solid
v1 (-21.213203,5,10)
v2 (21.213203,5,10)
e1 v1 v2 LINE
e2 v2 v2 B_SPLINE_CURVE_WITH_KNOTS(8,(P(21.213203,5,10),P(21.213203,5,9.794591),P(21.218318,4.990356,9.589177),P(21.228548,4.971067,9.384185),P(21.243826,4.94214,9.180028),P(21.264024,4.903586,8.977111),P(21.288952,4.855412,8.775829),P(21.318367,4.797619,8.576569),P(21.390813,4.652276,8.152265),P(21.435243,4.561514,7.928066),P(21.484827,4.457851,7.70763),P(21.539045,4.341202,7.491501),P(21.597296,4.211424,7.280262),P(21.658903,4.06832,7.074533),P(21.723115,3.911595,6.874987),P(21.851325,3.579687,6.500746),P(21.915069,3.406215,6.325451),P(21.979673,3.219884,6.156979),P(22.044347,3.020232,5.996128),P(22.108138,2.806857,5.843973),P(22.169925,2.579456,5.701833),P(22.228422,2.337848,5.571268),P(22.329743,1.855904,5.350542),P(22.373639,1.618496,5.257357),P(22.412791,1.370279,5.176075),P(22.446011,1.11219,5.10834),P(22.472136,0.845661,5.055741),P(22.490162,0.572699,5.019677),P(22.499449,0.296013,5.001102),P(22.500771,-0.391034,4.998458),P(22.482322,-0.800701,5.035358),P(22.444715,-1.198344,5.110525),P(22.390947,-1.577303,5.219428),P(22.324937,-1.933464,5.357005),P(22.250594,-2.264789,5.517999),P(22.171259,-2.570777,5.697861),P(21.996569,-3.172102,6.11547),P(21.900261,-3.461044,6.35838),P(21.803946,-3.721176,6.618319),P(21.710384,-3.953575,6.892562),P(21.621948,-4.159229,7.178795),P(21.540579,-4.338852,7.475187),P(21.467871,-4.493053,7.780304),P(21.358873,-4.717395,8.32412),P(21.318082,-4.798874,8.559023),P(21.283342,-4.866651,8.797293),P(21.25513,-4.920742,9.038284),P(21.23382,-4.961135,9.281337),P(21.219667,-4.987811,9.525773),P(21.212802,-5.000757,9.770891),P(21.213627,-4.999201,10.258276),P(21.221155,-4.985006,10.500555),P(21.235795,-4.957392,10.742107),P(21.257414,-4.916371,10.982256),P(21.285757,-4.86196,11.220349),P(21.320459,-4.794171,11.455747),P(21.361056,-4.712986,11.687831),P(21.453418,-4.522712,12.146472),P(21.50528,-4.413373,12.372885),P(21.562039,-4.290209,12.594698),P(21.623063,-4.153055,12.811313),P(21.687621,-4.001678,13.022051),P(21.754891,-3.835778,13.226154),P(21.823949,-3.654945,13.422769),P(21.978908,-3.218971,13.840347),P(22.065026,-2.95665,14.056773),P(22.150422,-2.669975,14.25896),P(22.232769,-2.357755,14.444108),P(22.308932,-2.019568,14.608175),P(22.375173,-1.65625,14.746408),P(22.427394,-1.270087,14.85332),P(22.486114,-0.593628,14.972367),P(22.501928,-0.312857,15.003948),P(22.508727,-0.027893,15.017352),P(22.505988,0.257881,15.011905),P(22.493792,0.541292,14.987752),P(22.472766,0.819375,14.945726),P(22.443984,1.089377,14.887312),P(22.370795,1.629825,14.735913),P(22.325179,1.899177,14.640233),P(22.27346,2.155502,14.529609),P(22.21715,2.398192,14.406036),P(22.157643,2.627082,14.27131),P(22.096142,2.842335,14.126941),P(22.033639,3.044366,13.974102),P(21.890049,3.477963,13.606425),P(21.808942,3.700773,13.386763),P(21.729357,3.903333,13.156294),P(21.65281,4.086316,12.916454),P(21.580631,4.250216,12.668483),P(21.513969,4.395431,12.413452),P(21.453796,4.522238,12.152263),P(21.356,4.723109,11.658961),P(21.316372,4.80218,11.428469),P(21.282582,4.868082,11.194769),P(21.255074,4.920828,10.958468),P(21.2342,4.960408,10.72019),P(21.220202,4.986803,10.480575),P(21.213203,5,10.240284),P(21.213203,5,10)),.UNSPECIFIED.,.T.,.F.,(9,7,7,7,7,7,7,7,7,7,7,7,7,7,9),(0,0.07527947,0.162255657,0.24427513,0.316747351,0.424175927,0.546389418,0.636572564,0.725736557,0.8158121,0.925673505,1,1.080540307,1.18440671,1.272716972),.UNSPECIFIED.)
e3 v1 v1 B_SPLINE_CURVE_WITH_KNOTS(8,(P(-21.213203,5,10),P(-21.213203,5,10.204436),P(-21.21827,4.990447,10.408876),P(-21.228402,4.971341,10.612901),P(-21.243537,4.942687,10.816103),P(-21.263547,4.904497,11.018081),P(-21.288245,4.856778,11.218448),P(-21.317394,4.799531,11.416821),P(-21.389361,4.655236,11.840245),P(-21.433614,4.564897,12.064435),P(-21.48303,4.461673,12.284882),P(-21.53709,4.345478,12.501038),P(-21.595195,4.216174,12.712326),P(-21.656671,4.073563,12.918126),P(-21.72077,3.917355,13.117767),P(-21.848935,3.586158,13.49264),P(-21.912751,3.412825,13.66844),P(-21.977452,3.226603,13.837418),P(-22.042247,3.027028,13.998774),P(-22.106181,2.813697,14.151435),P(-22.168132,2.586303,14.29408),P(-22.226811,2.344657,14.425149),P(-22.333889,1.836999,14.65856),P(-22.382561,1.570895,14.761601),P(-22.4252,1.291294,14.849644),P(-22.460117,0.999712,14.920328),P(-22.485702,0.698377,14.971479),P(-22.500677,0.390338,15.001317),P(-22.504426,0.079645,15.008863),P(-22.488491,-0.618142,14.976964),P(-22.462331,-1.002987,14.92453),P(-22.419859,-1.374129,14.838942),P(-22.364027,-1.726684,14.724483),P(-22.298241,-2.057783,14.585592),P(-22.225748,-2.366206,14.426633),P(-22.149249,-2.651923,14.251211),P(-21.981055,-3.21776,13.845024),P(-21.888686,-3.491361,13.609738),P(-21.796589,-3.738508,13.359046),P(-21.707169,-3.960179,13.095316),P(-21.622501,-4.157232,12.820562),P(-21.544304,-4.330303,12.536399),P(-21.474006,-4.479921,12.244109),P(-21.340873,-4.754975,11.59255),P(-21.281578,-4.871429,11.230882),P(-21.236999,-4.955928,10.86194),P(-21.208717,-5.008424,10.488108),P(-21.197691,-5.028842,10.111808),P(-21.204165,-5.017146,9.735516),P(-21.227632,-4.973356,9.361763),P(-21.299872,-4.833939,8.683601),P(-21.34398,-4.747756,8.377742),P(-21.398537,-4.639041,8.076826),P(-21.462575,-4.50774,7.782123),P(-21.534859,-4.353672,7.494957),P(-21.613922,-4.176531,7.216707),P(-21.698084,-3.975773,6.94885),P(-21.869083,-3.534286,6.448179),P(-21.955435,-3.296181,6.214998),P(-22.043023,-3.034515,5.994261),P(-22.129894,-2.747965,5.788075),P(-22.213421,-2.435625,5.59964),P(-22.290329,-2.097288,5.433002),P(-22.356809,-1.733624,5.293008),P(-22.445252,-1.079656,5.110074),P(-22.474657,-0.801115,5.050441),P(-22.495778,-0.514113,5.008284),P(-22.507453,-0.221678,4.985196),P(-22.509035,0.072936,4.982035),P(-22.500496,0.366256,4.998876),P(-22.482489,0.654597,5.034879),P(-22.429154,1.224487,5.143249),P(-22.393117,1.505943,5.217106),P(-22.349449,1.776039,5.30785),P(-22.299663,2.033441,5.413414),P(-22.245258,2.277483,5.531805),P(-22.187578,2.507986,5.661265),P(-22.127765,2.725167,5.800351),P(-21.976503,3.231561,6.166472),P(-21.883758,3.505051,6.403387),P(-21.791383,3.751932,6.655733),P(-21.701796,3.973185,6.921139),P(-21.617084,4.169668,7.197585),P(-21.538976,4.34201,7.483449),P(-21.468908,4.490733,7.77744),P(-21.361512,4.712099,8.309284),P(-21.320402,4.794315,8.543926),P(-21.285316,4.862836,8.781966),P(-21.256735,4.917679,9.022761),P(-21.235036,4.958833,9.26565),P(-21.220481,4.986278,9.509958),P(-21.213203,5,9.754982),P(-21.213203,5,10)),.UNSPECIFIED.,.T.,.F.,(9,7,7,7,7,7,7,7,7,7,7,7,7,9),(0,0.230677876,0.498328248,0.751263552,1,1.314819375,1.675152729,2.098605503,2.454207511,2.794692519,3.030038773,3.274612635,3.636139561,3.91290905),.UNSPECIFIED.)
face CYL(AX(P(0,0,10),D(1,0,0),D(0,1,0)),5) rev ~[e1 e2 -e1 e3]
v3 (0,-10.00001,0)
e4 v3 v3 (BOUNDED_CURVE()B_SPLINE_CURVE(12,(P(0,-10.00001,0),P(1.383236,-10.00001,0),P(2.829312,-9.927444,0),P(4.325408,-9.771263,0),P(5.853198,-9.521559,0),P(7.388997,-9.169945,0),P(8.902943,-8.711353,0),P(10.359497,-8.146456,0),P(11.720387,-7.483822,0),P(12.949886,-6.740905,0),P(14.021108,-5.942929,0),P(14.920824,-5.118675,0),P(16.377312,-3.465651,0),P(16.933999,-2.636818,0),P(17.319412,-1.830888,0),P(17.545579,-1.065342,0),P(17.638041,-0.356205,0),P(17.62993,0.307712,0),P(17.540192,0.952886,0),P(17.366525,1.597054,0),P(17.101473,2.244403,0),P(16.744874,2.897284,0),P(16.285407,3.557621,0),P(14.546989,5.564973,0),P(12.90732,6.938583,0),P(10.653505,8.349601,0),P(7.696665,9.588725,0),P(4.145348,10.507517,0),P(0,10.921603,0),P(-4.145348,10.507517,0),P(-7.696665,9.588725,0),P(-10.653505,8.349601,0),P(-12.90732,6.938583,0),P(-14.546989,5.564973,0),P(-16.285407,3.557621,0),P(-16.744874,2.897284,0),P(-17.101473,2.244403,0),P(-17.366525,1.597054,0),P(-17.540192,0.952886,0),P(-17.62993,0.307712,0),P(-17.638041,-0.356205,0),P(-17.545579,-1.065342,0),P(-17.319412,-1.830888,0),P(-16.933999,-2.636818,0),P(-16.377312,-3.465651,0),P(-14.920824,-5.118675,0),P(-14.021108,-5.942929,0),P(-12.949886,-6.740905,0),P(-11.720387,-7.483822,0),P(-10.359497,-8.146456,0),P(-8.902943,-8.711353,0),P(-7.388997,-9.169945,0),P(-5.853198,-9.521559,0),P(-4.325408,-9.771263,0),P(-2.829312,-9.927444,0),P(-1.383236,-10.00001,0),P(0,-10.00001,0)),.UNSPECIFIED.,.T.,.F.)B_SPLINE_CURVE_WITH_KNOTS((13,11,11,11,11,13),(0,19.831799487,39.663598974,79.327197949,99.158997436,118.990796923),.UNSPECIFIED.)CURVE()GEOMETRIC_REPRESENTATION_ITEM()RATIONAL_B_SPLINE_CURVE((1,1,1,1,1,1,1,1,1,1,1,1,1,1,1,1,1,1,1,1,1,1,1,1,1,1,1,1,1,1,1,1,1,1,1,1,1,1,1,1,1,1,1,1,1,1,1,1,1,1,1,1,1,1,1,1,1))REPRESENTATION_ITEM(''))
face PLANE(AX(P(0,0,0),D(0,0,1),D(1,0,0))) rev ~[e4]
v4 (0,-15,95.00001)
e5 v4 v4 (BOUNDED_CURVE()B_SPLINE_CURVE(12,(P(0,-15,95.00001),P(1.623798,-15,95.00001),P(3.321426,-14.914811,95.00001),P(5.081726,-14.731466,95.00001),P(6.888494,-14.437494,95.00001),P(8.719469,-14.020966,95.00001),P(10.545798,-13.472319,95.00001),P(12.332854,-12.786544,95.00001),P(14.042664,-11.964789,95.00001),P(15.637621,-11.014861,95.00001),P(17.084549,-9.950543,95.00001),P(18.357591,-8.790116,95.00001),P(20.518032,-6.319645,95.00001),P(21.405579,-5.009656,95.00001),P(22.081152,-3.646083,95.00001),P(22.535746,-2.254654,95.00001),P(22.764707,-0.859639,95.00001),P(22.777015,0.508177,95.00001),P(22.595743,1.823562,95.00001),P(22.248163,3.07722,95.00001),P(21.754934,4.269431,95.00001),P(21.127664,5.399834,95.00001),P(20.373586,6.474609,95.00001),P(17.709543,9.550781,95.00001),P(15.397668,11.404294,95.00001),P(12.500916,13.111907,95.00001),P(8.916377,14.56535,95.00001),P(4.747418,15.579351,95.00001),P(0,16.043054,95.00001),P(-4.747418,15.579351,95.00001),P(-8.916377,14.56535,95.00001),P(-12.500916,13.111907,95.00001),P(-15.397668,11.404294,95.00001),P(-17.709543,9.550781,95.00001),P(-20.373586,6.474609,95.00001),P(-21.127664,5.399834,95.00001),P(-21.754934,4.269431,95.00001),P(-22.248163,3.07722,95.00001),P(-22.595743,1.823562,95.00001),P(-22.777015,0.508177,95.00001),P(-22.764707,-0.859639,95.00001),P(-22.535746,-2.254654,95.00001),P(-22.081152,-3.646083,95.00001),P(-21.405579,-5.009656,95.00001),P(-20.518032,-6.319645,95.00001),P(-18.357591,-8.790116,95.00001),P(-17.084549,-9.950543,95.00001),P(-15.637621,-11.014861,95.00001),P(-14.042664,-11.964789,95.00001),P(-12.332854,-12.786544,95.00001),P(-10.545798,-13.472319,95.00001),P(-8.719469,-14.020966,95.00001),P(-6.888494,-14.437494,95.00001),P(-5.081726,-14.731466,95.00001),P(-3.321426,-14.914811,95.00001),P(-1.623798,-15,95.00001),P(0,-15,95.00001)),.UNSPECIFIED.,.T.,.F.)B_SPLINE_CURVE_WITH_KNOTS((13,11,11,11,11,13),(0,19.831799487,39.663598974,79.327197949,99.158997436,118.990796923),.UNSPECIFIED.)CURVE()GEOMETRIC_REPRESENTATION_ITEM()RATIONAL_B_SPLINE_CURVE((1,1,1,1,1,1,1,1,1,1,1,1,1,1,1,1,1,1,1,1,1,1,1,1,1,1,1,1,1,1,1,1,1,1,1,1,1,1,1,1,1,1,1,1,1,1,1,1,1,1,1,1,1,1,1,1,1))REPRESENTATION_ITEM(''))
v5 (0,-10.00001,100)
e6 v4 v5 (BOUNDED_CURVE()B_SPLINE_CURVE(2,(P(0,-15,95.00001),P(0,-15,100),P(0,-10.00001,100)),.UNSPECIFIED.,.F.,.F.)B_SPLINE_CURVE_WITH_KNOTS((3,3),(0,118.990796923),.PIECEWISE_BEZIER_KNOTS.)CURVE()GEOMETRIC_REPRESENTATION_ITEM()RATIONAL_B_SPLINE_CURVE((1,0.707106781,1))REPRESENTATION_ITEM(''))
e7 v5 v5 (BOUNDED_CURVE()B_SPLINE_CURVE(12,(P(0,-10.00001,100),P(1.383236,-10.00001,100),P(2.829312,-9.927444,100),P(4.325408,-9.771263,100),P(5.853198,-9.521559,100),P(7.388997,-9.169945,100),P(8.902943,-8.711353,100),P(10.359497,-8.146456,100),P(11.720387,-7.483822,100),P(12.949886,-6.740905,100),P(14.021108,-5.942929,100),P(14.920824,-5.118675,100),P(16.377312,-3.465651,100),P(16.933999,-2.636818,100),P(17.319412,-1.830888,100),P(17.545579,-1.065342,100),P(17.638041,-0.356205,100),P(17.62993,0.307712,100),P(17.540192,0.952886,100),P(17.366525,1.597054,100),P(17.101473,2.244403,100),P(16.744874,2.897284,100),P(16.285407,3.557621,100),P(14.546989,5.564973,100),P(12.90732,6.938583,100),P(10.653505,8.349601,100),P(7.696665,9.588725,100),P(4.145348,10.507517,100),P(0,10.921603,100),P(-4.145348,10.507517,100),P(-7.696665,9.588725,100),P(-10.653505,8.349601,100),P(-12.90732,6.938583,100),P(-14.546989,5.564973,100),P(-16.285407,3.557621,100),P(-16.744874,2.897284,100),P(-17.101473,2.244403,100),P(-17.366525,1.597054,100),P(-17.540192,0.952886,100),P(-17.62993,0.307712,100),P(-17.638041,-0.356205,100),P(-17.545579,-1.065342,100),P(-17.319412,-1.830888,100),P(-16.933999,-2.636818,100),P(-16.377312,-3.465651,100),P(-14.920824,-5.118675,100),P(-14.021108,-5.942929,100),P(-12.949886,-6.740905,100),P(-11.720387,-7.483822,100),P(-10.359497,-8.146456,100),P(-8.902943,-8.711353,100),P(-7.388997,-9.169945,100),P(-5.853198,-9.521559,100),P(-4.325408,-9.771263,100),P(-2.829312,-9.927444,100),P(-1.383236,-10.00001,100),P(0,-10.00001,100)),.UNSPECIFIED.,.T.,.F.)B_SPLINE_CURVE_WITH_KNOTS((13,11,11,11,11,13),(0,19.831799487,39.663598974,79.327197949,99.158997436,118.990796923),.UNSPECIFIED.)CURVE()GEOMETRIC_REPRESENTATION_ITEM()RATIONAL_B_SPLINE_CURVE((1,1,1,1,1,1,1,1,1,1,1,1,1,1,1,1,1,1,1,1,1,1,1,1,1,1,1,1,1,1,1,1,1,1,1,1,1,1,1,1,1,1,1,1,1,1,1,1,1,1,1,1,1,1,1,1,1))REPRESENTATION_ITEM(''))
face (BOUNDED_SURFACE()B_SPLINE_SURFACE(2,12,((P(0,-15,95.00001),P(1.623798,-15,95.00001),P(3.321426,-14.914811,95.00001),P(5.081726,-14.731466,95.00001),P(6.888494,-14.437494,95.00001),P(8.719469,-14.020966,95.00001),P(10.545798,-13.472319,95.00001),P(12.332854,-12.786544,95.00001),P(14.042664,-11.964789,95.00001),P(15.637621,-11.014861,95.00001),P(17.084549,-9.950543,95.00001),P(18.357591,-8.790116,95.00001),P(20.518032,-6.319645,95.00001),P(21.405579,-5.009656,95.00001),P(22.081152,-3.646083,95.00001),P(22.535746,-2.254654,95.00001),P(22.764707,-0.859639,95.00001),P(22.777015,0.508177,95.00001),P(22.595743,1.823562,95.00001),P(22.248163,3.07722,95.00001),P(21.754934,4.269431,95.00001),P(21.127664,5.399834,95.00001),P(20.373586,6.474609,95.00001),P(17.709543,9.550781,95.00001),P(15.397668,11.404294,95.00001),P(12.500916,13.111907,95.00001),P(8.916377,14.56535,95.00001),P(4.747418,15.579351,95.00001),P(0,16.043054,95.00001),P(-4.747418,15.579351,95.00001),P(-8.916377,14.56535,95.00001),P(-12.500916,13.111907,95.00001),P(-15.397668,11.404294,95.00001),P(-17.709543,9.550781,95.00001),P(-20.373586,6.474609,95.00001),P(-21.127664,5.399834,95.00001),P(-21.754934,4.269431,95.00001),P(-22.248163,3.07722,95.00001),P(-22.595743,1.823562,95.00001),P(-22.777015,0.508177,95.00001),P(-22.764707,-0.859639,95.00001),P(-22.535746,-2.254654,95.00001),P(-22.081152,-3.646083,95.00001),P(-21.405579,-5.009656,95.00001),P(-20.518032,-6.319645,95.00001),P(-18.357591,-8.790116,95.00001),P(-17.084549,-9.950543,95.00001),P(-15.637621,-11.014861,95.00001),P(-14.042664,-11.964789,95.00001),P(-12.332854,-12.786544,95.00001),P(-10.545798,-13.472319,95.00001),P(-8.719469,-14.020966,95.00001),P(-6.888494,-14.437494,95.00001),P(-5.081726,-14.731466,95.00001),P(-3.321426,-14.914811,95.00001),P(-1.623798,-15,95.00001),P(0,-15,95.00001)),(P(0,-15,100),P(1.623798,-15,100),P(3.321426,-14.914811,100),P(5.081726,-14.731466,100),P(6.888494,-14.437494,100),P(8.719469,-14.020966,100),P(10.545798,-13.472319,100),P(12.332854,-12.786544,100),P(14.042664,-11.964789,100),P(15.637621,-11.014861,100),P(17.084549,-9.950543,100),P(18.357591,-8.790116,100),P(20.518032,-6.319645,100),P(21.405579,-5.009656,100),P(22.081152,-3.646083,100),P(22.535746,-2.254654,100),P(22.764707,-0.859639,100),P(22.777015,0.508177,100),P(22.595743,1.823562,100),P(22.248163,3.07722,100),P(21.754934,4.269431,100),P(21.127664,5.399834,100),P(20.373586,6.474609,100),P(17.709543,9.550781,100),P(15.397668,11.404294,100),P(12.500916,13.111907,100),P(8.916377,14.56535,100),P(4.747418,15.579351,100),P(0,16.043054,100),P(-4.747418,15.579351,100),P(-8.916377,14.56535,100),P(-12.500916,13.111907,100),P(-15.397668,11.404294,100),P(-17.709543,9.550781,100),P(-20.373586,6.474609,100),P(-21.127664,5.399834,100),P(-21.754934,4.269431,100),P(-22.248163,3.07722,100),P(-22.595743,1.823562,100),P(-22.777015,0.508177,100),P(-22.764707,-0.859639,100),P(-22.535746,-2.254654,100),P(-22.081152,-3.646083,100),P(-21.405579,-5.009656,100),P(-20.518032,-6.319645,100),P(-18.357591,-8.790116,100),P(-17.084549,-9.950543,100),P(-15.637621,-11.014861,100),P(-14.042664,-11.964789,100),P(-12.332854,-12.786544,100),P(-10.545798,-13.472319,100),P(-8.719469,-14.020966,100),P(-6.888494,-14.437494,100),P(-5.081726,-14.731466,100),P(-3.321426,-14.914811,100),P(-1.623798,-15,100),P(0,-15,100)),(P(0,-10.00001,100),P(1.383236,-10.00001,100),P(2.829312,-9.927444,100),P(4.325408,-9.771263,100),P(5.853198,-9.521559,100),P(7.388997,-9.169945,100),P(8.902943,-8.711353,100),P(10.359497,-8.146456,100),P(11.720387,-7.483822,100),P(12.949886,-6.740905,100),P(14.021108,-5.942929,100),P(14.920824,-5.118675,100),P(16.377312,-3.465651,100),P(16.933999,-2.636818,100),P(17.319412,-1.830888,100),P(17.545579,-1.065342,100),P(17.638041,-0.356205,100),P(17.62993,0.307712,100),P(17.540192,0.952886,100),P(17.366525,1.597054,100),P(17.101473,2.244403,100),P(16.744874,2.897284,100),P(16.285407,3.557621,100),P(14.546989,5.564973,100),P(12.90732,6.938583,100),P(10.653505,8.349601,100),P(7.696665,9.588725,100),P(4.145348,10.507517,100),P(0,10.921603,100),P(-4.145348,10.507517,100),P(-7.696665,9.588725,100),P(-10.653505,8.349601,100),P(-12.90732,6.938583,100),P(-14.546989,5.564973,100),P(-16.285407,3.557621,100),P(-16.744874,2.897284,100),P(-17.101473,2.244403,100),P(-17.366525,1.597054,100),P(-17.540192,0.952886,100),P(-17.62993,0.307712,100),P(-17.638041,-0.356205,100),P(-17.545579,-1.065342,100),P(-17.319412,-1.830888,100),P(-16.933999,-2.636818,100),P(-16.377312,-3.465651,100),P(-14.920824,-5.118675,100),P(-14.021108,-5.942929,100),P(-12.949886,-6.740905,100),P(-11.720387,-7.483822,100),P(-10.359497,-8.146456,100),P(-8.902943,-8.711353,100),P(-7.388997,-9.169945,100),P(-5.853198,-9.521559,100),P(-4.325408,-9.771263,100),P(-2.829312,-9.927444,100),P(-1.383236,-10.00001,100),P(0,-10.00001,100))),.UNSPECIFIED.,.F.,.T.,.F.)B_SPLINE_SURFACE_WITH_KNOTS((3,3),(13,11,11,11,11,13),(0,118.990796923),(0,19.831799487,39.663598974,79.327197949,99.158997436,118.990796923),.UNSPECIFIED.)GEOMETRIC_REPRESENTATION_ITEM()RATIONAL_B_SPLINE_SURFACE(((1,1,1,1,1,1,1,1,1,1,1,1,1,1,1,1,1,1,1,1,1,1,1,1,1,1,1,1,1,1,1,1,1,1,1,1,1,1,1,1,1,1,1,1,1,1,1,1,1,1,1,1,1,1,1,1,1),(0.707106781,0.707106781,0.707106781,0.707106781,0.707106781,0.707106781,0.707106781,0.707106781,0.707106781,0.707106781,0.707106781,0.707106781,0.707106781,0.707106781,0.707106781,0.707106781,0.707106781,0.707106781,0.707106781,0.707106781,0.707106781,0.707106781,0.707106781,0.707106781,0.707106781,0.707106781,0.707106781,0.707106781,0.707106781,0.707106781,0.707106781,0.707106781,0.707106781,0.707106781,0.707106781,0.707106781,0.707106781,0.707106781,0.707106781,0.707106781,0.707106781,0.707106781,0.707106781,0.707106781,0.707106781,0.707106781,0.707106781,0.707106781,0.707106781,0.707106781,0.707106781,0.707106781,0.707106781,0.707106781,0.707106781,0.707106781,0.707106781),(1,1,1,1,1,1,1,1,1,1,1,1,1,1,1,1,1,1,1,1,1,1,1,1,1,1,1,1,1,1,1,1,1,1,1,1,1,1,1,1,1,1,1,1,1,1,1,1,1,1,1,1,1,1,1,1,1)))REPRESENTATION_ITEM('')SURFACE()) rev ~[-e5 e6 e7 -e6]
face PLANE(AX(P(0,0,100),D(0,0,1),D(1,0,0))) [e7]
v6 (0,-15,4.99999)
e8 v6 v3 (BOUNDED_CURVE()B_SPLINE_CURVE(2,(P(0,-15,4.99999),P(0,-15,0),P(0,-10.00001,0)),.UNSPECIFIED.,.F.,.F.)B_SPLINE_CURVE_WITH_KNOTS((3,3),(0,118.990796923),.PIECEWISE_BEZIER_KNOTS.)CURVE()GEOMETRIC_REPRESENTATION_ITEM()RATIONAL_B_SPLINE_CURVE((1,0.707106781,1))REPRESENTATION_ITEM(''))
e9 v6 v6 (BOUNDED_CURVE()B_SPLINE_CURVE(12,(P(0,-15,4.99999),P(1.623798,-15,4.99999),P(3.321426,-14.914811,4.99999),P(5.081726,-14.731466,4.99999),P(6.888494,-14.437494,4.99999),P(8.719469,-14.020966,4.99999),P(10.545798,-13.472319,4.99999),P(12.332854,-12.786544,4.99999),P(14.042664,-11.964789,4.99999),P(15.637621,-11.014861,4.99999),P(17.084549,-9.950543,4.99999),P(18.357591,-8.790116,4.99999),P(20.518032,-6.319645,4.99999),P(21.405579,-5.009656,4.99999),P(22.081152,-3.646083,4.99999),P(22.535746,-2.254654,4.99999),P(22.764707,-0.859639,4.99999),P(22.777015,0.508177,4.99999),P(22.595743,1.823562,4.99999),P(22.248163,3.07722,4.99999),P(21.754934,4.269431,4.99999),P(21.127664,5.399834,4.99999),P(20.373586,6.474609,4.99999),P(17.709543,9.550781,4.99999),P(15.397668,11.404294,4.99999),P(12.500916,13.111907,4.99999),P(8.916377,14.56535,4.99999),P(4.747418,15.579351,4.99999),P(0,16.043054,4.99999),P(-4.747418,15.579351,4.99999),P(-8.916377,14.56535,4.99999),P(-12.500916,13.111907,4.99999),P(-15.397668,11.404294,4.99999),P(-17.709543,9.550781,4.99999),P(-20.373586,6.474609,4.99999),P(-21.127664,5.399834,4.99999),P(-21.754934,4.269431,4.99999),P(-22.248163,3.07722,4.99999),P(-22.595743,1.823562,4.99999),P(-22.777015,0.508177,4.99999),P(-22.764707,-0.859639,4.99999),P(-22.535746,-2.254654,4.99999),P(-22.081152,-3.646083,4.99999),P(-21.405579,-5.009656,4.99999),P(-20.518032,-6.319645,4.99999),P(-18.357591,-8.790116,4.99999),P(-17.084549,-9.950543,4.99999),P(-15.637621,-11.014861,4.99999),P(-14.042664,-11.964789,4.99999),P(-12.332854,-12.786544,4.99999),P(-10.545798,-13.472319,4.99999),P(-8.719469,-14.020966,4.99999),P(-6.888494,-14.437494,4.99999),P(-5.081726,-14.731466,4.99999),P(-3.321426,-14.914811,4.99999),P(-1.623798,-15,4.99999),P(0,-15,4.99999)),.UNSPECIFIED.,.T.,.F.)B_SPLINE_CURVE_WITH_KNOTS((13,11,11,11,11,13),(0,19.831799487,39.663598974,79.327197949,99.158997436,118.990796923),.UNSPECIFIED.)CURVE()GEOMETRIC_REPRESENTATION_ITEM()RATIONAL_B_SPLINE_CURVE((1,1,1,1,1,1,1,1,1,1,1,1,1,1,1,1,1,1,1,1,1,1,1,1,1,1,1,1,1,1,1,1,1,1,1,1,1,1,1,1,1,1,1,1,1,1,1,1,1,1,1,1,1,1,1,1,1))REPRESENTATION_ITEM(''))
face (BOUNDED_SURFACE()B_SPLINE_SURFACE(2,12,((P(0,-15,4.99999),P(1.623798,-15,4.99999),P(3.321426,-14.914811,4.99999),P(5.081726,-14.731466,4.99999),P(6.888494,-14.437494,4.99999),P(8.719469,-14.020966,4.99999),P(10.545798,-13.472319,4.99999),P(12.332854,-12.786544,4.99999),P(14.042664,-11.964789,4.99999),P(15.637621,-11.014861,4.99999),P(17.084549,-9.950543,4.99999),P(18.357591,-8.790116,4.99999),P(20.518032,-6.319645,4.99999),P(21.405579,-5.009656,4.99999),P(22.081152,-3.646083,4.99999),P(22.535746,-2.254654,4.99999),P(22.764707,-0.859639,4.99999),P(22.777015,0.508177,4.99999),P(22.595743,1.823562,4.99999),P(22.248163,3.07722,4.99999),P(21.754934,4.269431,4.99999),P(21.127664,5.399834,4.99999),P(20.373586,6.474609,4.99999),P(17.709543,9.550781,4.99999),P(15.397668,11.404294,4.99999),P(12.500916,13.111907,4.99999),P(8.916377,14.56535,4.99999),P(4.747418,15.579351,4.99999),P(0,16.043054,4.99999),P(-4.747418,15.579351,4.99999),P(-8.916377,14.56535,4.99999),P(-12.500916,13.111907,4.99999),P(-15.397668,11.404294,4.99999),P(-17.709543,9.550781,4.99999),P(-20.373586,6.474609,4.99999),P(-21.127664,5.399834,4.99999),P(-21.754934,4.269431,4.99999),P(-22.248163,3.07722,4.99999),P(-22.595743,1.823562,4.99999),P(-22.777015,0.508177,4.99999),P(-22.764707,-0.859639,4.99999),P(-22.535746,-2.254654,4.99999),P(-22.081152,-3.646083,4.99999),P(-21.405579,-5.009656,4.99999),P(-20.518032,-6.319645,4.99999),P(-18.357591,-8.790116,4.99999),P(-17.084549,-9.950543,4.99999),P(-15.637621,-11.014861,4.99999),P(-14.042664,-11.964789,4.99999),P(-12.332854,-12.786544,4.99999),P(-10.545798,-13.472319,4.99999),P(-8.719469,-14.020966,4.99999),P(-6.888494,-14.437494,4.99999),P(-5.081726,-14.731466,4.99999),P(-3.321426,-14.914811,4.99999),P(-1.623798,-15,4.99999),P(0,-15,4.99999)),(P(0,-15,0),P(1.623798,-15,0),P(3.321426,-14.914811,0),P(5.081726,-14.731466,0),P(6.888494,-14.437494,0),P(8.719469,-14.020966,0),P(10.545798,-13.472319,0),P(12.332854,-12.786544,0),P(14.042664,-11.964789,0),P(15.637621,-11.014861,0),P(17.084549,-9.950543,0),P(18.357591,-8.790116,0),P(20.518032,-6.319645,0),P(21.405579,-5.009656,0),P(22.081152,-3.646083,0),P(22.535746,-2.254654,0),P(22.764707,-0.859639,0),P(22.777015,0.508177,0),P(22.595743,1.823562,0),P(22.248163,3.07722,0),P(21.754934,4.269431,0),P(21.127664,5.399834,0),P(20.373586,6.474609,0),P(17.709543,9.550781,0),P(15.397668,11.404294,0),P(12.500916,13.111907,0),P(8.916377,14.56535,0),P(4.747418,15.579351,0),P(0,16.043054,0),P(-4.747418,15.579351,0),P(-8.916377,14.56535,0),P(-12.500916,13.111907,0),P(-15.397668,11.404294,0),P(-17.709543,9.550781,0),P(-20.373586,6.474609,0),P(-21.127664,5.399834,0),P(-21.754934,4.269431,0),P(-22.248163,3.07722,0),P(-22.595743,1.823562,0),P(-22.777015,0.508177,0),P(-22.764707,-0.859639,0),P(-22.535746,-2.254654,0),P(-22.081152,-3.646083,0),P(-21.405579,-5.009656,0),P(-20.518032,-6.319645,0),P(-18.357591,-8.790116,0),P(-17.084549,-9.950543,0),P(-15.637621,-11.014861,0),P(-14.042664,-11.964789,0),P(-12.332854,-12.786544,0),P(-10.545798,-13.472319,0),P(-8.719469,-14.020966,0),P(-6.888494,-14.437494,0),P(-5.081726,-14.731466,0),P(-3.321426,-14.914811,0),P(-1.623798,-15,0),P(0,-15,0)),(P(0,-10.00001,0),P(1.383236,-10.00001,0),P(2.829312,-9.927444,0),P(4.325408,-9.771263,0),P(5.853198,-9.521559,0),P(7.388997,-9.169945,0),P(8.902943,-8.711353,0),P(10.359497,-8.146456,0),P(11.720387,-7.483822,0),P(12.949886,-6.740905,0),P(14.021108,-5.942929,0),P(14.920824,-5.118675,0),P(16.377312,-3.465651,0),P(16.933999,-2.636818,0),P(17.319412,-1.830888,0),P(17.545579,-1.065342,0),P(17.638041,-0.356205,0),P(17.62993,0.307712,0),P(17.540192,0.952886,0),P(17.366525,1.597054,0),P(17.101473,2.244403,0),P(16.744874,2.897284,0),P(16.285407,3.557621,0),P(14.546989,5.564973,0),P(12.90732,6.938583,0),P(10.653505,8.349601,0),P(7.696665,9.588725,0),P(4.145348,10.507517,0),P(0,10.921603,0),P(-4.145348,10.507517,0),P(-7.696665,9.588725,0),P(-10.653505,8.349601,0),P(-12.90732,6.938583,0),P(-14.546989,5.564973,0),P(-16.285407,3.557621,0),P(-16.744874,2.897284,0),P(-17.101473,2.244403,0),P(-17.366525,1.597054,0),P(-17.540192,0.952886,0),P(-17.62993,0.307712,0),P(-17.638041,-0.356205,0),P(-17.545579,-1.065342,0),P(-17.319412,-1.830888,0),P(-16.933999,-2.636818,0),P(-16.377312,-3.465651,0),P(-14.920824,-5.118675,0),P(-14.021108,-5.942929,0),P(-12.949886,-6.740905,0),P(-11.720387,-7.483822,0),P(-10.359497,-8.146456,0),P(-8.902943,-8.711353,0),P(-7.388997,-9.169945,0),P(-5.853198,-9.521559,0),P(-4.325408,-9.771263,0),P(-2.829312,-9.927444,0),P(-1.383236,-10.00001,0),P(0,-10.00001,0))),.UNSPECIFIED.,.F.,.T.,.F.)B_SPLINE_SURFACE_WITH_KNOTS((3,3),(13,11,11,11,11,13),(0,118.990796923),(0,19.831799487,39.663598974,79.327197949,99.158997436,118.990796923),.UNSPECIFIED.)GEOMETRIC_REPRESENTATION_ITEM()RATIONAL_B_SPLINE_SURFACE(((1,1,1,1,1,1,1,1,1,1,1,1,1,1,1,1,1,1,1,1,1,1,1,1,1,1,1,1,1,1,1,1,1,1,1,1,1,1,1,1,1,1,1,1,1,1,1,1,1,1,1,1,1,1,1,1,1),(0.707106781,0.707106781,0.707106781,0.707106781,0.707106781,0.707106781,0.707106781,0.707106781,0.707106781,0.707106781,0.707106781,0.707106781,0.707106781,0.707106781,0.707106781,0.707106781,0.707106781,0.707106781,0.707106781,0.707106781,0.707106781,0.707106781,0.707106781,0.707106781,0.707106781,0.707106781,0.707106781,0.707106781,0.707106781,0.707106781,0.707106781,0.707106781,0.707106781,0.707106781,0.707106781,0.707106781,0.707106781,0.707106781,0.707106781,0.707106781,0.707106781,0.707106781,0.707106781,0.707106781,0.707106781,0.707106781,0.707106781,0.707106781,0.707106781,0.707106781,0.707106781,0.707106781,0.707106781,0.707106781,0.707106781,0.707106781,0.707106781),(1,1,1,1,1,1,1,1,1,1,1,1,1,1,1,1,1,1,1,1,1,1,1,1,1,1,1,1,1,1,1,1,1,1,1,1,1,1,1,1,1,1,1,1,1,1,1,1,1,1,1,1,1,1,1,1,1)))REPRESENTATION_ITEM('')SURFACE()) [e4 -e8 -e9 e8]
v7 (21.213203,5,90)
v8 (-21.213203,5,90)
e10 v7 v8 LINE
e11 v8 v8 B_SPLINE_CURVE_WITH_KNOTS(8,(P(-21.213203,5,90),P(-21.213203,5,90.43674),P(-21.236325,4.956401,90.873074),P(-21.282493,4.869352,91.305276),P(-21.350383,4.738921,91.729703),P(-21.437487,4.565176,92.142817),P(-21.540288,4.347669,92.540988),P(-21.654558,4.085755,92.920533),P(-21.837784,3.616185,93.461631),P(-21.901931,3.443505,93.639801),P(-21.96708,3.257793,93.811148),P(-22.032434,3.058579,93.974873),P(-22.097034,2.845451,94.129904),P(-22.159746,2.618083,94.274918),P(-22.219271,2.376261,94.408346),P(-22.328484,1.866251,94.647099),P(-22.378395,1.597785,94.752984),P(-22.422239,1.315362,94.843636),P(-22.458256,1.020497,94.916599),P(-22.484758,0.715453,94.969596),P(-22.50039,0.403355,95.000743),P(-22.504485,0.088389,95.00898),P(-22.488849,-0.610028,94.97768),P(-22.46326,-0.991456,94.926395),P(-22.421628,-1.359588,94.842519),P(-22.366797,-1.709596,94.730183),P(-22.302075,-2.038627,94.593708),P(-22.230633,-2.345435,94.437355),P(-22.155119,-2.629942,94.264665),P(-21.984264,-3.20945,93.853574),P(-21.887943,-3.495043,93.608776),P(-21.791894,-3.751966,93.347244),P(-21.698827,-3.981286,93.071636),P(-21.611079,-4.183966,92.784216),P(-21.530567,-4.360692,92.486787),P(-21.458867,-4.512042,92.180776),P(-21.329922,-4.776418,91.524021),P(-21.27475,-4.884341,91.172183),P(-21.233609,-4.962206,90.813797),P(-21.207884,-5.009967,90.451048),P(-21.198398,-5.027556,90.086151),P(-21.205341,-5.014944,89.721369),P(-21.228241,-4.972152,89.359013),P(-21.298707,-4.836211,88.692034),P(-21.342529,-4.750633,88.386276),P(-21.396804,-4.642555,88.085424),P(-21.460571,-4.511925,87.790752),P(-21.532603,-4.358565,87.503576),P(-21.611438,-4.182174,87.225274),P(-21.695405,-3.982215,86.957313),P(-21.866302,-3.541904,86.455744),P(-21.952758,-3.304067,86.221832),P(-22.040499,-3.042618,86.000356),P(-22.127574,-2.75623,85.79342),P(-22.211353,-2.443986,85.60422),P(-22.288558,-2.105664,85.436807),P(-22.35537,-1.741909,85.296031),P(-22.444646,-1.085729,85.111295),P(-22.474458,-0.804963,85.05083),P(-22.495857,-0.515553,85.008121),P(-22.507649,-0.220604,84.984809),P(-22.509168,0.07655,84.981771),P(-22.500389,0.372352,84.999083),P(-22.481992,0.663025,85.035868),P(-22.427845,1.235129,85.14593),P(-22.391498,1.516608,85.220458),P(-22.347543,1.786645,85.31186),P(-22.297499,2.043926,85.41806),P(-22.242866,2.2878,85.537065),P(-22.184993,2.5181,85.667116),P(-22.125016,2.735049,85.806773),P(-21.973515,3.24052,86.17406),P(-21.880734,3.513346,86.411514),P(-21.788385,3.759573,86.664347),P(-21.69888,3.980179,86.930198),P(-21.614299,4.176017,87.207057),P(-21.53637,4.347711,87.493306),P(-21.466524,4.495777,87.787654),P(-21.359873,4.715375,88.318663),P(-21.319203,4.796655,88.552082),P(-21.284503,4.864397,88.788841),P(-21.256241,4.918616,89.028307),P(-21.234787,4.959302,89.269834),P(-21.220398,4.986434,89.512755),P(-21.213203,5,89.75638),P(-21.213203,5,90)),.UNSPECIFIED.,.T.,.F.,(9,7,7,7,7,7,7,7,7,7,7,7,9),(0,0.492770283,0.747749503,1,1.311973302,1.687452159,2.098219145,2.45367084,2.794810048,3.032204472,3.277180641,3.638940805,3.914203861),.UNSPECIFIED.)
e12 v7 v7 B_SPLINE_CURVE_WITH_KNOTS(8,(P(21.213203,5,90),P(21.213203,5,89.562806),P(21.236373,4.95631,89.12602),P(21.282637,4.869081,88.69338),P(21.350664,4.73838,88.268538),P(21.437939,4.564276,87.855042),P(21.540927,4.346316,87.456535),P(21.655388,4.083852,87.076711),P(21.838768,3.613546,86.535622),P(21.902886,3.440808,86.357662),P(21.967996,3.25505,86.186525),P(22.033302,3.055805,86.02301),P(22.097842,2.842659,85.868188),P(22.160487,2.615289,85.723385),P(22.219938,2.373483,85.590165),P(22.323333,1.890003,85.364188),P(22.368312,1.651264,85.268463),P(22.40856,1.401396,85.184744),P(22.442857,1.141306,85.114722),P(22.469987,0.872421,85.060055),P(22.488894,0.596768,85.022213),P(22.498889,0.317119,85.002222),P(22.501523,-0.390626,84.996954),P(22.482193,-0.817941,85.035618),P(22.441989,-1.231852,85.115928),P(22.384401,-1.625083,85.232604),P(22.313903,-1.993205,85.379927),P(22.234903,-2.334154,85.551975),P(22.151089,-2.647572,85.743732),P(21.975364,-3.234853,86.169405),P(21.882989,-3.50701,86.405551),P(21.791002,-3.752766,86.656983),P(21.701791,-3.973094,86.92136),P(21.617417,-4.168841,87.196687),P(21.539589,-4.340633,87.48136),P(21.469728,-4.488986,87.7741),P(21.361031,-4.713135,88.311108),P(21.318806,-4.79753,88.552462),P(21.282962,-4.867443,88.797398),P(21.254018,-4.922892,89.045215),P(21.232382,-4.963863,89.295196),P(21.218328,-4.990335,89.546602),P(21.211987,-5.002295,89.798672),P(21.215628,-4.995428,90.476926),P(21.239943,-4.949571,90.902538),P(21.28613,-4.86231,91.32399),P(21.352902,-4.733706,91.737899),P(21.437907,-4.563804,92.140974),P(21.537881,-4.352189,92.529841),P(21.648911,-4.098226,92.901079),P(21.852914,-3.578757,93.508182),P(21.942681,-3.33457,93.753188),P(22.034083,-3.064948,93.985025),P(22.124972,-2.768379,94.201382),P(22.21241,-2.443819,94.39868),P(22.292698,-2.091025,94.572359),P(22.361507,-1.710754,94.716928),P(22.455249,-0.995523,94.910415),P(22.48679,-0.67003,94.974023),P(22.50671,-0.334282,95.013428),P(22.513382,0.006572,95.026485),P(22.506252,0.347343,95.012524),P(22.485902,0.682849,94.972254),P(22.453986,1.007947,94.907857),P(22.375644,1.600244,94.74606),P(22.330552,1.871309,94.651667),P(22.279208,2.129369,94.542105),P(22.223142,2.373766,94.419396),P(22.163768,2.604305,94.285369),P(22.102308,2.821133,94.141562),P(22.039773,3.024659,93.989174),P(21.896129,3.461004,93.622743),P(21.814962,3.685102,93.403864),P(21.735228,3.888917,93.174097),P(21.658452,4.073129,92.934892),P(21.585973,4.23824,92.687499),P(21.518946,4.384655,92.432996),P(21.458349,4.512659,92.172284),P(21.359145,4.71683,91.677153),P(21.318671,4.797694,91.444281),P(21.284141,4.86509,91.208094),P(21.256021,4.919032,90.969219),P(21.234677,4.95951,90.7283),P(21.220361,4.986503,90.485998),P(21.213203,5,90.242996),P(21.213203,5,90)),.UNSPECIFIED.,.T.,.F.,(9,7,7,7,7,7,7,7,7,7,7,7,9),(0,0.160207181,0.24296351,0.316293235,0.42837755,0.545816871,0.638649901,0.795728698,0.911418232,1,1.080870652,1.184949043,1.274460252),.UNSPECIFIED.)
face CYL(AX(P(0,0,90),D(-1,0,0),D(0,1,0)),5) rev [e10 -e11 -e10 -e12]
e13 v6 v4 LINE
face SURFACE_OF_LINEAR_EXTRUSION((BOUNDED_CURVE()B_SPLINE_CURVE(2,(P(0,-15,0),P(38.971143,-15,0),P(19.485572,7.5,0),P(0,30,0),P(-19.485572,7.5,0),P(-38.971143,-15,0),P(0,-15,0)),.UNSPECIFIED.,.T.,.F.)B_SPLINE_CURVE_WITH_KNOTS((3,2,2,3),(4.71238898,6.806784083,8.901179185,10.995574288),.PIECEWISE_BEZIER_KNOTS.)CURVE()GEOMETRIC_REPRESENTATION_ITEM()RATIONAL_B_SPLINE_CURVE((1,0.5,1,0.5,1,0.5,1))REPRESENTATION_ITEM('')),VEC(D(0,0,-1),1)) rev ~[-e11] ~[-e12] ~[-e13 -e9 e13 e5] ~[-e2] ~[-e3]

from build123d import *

# Parameters (mm, degrees)
F1_DEPTH = 100
F2_R     = 5
F3_DEPTH = 25
F4_R     = 4.99999


# Not quite as in the source:
# - a fillet or chamfer is up to 0.001 mm smaller than in the source, because OpenCascade refuses the exact size


with BuildPart() as f1:
    # F0 (on Top) → F1 (new body)
    with BuildSketch(Plane.XY):
        with BuildLine():
            add(Edge.make_bspline(
                [(0, -15), (38.9711431703, -15), (19.4855715851, 7.5), (0, 30), (-19.4855715851, 7.5), (-38.9711431703, -15), (0, -15)],
                knots=[4.7123889804, 4.7123889804, 4.7123889804, 6.8067840828, 6.8067840828, 8.9011791852, 8.9011791852, 10.9955742876, 10.9955742876, 10.9955742876], degree=2, weights=[1, 0.5, 1, 0.5, 1, 0.5, 1]))
        make_face()
    extrude(amount=F1_DEPTH)

    # F2 (on Right) → F3 (cut, symmetric)
    with BuildSketch(Plane.YZ):
        with Locations((0, 90)):
            Circle(F2_R)
        with Locations((0, 10)):
            Circle(F2_R)
    extrude(amount=F3_DEPTH, both=True, mode=Mode.SUBTRACT)

    # F4 (radius 5 in the source; OpenCascade refuses exactly that, so slightly less here)
    f4_edges = [f1.edges().sort_by_distance(p)[0] for p in [
        (0, 15, 100),
        (0, 15, 0),
    ]]
    fillet(f4_edges, radius=F4_R)


solid = f1.part
